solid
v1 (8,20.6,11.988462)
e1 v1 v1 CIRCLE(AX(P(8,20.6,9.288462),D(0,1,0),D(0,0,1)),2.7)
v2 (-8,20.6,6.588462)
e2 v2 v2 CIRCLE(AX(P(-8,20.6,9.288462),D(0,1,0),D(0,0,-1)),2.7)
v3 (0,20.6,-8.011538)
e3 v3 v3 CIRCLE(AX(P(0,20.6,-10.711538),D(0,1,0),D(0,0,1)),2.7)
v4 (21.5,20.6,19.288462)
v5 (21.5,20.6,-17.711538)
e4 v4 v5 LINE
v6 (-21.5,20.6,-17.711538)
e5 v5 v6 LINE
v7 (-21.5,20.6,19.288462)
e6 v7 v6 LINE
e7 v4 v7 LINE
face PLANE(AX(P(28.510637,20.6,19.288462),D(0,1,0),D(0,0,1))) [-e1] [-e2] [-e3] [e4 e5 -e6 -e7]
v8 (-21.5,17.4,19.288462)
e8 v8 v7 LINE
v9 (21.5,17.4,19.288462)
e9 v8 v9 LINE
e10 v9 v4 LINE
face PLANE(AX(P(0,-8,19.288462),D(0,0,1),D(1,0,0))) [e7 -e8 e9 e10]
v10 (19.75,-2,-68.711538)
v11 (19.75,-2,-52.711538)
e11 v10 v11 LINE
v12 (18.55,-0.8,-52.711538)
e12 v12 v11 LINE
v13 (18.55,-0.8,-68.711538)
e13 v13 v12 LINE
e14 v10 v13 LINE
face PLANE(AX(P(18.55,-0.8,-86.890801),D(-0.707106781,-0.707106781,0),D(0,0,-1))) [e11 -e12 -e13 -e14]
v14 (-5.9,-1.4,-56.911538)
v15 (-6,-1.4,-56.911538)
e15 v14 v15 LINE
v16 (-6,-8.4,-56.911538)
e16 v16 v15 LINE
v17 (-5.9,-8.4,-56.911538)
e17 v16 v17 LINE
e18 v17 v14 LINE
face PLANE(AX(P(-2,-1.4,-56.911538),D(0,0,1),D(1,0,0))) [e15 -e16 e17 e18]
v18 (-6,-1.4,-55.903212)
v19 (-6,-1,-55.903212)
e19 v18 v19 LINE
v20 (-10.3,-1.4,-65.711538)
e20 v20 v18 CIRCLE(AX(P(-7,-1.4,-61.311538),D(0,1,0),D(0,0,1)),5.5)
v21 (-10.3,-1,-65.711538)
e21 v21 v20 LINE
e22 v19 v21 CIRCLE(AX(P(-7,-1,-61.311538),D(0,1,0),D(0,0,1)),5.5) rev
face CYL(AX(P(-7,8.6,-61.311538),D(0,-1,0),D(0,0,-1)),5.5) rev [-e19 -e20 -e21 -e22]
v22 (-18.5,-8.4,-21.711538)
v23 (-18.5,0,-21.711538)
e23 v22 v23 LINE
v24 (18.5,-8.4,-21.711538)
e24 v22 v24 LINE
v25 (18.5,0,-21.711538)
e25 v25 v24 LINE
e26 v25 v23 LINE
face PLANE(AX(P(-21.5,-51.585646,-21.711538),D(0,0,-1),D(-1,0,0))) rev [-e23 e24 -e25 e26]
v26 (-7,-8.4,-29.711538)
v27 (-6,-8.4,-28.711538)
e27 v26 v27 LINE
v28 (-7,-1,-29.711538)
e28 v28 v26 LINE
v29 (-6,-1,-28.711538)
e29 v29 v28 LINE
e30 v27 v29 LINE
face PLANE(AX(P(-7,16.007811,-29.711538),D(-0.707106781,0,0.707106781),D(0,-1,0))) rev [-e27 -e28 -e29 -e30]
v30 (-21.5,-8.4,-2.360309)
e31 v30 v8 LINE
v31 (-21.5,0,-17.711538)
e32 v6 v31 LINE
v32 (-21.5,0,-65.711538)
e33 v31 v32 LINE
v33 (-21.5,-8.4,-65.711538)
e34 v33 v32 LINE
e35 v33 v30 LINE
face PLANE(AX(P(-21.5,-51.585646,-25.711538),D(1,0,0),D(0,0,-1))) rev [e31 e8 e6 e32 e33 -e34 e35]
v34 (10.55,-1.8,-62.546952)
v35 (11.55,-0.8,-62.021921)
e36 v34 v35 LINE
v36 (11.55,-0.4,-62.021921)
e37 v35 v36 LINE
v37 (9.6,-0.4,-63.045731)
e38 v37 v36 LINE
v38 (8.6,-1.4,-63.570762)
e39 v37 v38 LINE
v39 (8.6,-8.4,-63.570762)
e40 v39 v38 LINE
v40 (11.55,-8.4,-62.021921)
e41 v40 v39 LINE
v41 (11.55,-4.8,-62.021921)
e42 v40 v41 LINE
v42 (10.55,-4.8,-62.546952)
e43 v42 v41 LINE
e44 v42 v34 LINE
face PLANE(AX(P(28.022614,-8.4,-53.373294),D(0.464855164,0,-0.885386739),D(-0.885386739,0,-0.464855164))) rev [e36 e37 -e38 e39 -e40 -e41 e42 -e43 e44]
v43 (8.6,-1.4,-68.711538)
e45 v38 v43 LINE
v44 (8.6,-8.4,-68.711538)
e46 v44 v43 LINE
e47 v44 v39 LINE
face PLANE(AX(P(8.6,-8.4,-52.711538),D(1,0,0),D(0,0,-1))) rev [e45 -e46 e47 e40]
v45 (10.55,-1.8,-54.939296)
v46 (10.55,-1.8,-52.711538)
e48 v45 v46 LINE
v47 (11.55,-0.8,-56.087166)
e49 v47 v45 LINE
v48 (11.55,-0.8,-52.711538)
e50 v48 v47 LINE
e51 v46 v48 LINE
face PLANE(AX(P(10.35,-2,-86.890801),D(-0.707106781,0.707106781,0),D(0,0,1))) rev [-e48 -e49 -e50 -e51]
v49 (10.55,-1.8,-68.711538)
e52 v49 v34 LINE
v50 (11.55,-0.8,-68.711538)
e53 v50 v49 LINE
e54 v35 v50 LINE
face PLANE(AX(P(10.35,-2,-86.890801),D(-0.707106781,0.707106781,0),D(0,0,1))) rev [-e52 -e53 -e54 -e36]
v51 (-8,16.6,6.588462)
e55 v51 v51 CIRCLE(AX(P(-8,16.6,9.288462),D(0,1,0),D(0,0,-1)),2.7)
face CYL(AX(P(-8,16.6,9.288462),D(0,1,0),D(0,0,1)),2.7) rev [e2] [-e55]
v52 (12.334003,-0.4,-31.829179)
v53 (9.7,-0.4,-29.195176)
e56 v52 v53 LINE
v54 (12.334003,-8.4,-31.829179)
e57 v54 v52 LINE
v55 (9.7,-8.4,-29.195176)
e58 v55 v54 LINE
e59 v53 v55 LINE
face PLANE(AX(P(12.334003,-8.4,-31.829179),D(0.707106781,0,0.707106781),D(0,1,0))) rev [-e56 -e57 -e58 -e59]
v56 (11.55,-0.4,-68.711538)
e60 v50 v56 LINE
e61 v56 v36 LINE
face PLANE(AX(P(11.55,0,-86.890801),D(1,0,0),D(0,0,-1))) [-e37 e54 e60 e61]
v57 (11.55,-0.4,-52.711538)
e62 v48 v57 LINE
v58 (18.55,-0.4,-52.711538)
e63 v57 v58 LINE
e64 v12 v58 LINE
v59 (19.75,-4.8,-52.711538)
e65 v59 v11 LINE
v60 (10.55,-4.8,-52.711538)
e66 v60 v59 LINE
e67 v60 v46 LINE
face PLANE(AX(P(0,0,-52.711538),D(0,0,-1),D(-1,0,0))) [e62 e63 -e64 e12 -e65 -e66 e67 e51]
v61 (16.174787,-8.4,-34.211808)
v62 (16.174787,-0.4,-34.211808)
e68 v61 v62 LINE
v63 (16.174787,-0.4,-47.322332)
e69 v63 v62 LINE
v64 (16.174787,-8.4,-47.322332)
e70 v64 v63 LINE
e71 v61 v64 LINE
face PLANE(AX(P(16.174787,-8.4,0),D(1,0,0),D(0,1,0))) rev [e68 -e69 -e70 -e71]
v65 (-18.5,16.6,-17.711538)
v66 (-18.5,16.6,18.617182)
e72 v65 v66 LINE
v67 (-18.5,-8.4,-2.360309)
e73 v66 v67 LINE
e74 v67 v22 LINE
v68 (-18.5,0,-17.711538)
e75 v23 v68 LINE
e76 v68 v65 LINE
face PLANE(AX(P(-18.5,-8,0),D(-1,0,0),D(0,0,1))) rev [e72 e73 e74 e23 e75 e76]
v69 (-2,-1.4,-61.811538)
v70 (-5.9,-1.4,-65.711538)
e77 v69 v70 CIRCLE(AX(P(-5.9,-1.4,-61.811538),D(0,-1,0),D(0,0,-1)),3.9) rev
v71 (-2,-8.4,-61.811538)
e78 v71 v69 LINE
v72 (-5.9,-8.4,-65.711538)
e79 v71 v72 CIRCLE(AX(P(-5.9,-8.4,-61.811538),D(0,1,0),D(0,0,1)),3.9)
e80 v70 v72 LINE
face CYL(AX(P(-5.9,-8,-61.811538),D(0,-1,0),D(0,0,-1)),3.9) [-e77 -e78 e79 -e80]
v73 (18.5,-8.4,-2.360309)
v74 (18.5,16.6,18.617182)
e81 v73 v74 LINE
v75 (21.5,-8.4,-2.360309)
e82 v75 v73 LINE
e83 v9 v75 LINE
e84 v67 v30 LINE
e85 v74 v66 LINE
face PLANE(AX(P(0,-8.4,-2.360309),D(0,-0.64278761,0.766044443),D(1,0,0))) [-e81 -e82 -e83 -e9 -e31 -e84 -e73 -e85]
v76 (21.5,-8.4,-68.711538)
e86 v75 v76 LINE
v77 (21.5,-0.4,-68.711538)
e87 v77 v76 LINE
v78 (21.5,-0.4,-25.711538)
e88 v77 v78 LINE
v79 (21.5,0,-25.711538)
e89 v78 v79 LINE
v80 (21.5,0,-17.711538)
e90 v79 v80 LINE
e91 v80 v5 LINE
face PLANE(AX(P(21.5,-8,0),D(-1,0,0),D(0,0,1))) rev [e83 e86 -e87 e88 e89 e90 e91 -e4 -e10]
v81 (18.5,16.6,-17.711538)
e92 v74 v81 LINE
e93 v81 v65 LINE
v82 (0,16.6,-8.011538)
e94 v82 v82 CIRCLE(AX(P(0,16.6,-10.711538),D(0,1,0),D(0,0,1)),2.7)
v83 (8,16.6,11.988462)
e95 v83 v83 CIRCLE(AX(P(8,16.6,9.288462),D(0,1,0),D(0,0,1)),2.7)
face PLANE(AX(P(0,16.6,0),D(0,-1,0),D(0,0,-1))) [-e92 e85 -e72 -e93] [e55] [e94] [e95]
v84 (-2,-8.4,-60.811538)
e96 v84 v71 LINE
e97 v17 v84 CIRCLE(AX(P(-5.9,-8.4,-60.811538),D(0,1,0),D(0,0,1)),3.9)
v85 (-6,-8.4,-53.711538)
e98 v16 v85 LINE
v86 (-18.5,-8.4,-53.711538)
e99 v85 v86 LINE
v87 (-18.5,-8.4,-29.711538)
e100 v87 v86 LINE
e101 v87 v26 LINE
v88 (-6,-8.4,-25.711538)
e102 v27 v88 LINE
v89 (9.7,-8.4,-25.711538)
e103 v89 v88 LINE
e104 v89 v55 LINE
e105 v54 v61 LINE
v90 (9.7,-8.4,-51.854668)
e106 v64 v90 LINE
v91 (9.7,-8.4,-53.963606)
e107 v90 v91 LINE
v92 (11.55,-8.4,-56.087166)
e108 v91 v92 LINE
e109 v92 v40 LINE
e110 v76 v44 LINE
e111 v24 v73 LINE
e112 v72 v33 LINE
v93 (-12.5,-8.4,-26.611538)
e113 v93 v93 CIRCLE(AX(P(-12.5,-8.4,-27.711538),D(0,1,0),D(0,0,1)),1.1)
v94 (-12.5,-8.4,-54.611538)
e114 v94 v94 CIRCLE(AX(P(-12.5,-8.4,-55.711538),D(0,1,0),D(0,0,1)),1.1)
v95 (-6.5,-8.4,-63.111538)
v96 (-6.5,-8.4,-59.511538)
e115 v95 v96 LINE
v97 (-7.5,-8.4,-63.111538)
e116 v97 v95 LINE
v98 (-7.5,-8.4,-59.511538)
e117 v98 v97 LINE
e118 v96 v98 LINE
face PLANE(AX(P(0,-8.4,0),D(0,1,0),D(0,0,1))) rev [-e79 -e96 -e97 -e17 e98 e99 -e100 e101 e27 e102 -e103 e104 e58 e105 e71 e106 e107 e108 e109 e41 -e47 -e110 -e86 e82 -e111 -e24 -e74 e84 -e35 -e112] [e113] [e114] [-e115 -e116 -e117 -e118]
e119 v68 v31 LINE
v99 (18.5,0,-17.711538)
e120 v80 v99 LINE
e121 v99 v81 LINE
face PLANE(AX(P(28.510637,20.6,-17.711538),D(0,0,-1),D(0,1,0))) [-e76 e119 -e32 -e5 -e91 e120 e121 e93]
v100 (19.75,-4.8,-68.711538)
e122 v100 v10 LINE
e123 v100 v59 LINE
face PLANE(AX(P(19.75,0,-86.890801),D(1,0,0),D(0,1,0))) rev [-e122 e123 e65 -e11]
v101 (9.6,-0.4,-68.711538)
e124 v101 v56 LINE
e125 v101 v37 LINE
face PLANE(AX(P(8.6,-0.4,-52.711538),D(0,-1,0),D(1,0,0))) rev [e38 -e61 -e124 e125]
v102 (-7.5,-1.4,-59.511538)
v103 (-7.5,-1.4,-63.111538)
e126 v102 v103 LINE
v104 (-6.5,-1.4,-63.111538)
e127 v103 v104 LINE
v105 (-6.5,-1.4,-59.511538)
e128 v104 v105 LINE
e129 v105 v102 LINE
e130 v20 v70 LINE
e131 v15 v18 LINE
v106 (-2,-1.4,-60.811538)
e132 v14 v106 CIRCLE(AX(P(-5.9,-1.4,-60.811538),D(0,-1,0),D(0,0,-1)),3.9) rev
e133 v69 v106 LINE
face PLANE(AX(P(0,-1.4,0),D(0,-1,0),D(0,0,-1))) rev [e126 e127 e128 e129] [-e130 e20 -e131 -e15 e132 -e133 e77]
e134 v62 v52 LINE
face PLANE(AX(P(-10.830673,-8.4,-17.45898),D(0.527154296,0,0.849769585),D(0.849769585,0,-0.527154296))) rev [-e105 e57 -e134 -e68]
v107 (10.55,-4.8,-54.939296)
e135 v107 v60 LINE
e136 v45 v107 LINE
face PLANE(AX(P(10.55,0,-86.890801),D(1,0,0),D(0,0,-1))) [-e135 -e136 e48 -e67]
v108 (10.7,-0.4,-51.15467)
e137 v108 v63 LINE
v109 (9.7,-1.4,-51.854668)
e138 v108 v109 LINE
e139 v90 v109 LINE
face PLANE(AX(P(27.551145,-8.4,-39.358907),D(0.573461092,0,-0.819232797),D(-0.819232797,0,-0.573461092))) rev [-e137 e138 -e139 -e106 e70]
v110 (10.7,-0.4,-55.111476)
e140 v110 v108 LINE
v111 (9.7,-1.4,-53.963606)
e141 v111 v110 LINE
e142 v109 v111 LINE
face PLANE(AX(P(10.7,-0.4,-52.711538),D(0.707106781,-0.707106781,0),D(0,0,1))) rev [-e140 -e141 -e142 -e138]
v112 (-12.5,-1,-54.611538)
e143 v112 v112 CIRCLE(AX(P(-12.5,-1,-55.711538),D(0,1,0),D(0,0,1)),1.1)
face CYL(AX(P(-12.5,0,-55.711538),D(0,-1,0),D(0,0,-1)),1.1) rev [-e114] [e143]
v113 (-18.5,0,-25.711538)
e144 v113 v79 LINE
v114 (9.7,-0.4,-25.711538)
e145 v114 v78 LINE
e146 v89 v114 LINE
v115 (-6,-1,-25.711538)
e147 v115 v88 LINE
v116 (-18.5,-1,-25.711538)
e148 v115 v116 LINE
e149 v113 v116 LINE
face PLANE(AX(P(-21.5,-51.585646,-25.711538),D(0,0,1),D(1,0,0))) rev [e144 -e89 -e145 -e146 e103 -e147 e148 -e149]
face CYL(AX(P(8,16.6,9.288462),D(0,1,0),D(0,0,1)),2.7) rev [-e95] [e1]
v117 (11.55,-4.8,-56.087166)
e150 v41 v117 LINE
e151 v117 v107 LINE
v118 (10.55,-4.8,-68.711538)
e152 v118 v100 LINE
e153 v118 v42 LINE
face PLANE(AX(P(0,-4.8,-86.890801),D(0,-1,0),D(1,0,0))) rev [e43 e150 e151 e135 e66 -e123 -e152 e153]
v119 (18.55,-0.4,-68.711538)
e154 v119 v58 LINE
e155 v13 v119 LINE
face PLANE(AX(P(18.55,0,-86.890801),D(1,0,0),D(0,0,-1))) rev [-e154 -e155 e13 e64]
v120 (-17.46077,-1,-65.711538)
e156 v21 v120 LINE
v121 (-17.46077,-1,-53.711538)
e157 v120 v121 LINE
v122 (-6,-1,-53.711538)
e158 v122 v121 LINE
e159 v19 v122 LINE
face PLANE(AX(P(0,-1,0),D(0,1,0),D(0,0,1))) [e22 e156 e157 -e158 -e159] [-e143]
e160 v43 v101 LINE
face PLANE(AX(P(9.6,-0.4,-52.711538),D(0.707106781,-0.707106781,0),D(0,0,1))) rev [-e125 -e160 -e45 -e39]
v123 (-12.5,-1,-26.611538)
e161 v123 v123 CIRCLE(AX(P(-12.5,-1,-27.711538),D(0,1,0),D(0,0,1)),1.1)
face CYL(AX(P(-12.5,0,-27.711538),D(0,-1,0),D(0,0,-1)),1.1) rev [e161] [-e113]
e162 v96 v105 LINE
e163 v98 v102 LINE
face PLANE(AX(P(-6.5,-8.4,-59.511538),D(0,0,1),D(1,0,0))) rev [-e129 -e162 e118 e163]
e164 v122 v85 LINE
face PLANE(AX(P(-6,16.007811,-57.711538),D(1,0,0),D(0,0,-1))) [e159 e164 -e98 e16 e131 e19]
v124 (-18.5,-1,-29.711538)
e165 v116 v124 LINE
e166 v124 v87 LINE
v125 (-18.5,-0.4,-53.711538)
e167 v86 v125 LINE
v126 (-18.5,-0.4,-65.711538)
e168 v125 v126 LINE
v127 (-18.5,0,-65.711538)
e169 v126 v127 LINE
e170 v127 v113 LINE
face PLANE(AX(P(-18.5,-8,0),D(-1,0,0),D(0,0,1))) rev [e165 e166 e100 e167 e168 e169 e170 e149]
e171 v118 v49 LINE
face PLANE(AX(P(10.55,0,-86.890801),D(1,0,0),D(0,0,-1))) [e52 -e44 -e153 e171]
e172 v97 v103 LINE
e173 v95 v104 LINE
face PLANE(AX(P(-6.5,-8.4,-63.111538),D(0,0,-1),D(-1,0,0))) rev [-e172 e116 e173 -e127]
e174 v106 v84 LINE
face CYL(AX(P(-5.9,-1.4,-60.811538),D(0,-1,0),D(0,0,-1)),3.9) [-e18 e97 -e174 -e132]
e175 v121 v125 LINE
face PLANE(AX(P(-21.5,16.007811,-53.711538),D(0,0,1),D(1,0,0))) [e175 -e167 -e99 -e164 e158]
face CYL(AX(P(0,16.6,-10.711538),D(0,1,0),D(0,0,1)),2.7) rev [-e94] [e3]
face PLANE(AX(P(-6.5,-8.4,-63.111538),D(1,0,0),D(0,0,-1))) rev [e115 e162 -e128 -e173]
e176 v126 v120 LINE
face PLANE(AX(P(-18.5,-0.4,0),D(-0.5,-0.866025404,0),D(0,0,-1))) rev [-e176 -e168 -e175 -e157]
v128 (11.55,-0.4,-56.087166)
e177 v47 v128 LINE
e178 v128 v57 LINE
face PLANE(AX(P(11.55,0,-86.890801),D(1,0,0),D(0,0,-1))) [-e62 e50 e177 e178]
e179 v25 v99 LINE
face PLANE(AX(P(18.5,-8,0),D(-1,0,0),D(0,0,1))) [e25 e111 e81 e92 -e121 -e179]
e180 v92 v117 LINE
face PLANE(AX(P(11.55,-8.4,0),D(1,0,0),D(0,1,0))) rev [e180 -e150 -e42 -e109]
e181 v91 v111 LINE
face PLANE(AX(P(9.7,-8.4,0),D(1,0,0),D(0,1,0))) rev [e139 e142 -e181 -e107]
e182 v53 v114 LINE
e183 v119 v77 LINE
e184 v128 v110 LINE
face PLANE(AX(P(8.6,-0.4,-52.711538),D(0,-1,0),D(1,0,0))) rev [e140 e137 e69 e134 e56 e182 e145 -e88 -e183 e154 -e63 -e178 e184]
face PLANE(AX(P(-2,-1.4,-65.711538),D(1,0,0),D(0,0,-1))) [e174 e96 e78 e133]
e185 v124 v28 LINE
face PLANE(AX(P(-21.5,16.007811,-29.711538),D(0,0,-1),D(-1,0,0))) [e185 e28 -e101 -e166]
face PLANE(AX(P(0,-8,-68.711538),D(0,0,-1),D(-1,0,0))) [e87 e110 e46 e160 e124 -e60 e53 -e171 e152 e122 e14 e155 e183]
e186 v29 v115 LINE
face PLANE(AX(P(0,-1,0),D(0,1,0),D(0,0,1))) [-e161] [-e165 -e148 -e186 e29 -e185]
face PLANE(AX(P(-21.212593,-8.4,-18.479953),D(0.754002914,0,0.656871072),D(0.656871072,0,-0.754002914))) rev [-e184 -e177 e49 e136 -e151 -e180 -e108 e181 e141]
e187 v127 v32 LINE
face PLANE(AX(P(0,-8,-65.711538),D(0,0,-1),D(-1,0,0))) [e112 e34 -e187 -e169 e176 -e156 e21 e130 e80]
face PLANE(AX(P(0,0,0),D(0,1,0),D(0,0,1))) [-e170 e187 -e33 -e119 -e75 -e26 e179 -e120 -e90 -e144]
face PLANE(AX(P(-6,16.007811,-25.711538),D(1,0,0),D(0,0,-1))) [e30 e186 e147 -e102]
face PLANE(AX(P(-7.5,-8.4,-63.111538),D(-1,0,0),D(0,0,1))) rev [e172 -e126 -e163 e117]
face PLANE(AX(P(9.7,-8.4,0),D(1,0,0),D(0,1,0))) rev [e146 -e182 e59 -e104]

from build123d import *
from OCP.BRepFilletAPI import BRepFilletAPI_MakeChamfer

# Parameters (mm, degrees)
SKETCH1_W                       = 3
SKETCH1_H                       = 37
SKETCH1_H_2                     = 48
BOSS_EXTRUDE1_DEPTH             = 8
SKETCH4_W                       = 19.5
SKETCH4_H                       = 8.8
BOSS_EXTRUDE3_DEPTH             = 6.6
SERVO_HOLDER_DEPTH              = 0.4
SERVO_HOLDER_DEPTH_BACK         = 7
SKETCH3_W                       = 15.5
SKETCH3_H                       = 4
SKETCH3_R                       = 1.04
SKETCH5_W                       = 1
SKETCH5_H                       = 3.6
CUT_EXTRUDE2_DEPTH              = 70.647801738
SKETCH11_W                      = 43
SKETCH11_H                      = 4
BOSS_EXTRUDE9_DEPTH             = 8
BOSS_EXTRUDE9_DIRECTION_2_REACH = 71.601
SKETCH14_W                      = 12.223643904
SKETCH14_H                      = 44.979564252
CUT_EXTRUDE5_DEPTH              = 10
FILLET2_R                       = 3.9
CUT_EXTRUDE4_DEPTH              = 70.647801738
CUT_EXTRUDE4_DEPTH_BACK         = 70.647801738
SKETCH13_R                      = 1.1
SKETCH17_W                      = 12.9
SKETCH17_H                      = 8
BOSS_EXTRUDE11_DEPTH            = 27
BOSS_EXTRUDE12_DEPTH            = 16
SKETCH18_W                      = 1
SKETCH18_H                      = 3.6
SKETCH18_W_2                    = 3
SKETCH18_H_2                    = 24
SKETCH18_H_3                    = 41
BOSS_EXTRUDE13_DEPTH            = 0.4
CHAMFER14_SIZE                  = 1.2
CUT_EXTRUDE6_DEPTH              = 73.439806169
CUT_EXTRUDE6_DEPTH_BACK         = 73.439806169
SKETCH22_W                      = 43
SKETCH22_H                      = 37
SKETCH22_R                      = 2.7
MOUNT_TOP_DEPTH                 = 4
SKETCH23_W                      = 37
SKETCH23_H                      = 29
MOUNT_SIDE1_DEPTH               = 3
SKETCH24_W                      = 37
SKETCH24_H                      = 29
MOUNT_SIDE2_DEPTH               = 3
CHAMFER20_SIZE                  = 21.648770484
CHAMFER20_SIZE_2                = 25.8
SKETCH29_W                      = 8.885937164
SKETCH29_H                      = 8
BOSS_EXTRUDE20_DEPTH            = 0.4
CHAMFER23_SIZE                  = 1
CHAMFER24_SIZE                  = 1
CHAMFER24_SIZE2                 = 3.099667104
SKETCH26_R                      = 5.5
CUT_EXTRUDE8_DEPTH              = 10
CHAMFER25_SIZE                  = 0.6
CHAMFER25_SIZE2                 = 1.039230485


with BuildPart() as part:
    # Sketch1 → Boss-Extrude1 (new body)
    with BuildSketch(Plane(origin=(0, 0, 0), x_dir=(1, 0, 0), z_dir=(0, 1, 0))):
        with Locations((-20, -0.788461538)):
            Rectangle(SKETCH1_W, SKETCH1_H)
        with Locations((-20, 41.711538462)):
            Rectangle(SKETCH1_W, SKETCH1_H_2)
        with Locations((20, -0.788461538)):
            Rectangle(SKETCH1_W, SKETCH1_H)
        with Locations((20, 41.711538462)):
            Rectangle(SKETCH1_W, SKETCH1_H_2)
    extrude(amount=-BOSS_EXTRUDE1_DEPTH)

    # Sketch4 → Boss-Extrude3 (add)
    with BuildSketch(Plane.XZ.offset(8)):
        with Locations((-11.75, -61.311538462)):
            Rectangle(SKETCH4_W, SKETCH4_H)
    extrude(amount=-BOSS_EXTRUDE3_DEPTH)

    # Sketch3 → Servo Holder (add, two sides: drawn at the far end of the back side and taken through both)
    # profile 1 of 2: a face of its own
    with BuildSketch(Plane.XZ.offset(8).offset(-SERVO_HOLDER_DEPTH_BACK)):
        with Locations((-13.75, -55.711538462)):
            Rectangle(SKETCH3_W, SKETCH3_H)
        with Locations(Location((-12.5, -55.711538462, 0), (0, 0, 270))):
            Circle(SKETCH3_R, mode=Mode.SUBTRACT)
    # profile 2 of 2: a face of its own
    with BuildSketch(Plane.XZ.offset(8).offset(-SERVO_HOLDER_DEPTH_BACK)):
        with Locations((-13.75, -27.711538462)):
            Rectangle(SKETCH3_W, SKETCH3_H)
        with Locations(Location((-12.5, -27.711538462, 0), (0, 0, 90))):
            Circle(SKETCH3_R, mode=Mode.SUBTRACT)
    extrude(amount=SERVO_HOLDER_DEPTH + SERVO_HOLDER_DEPTH_BACK)

    # Sketch5 → Cut-Extrude2 (cut, through all)
    with BuildSketch(Plane(origin=(0, 0, 0), x_dir=(1, 0, 0), z_dir=(0, 1, 0))):
        with Locations((-7, 61.311538462)):
            Rectangle(SKETCH5_W, SKETCH5_H)
    extrude(amount=-CUT_EXTRUDE2_DEPTH, mode=Mode.SUBTRACT)

    # Sketch11 → Boss-Extrude9 (add)
    with BuildSketch(Plane.XZ.offset(8)):
        with Locations((0, -23.711538462)):
            Rectangle(SKETCH11_W, SKETCH11_H)
    extrude(amount=-BOSS_EXTRUDE9_DEPTH)

    # Boss-Extrude9 direction 2: up to this face of the body (flat: up to its plane)
    boss_extrude9_direction_2_end = Plane(part.part.faces().sort_by_distance((-13.822479257, -8.4, -55.711538462))[0])
    # Sketch11 → Boss-Extrude9 direction 2 (add, up to the picked face)
    with BuildSketch(Plane.XZ.offset(8), mode=Mode.PRIVATE) as boss_extrude9_direction_2_sk1:
        with Locations((0, -23.711538462)):
            Rectangle(SKETCH11_W, SKETCH11_H)
    boss_extrude9_direction_2_tool1 = split(extrude(boss_extrude9_direction_2_sk1.sketch, amount=BOSS_EXTRUDE9_DIRECTION_2_REACH, mode=Mode.PRIVATE), bisect_by=boss_extrude9_direction_2_end, keep=Keep.BOTH, mode=Mode.PRIVATE)
    add(boss_extrude9_direction_2_tool1.solids().sort_by(Axis((0, -8, -23.711538), (0, -1, 0)))[0])

    # Sketch14 → Cut-Extrude5 (cut)
    with BuildSketch(Plane.XZ.offset(8)):
        with Locations((24.611821952, -48.201320588)):
            Rectangle(SKETCH14_W, SKETCH14_H)
    extrude(amount=-CUT_EXTRUDE5_DEPTH, mode=Mode.SUBTRACT)

    # Fillet2
    fillet2_edges = [part.edges().sort_by_distance(p)[0] for p in [
        (-2, -4.7, -65.711538462),
        (-2, -4.7, -56.911538462),
    ]]
    fillet(fillet2_edges, radius=FILLET2_R)

    # Sketch13 → Cut-Extrude4 (cut, two sides: drawn at the far end of the back side and taken through both)
    with BuildSketch(Plane(origin=(0, -8.4, 0), x_dir=(-1, 0, 0), z_dir=(0, -1, 0)).offset(-CUT_EXTRUDE4_DEPTH_BACK)):
        with Locations(Location((12.5, 55.711538462, 0), (0, 0, 270))):
            Circle(SKETCH13_R)
        with Locations(Location((12.5, 27.711538462, 0), (0, 0, 270))):
            Circle(SKETCH13_R)
    extrude(amount=CUT_EXTRUDE4_DEPTH + CUT_EXTRUDE4_DEPTH_BACK, mode=Mode.SUBTRACT)

    # Sketch17 → Boss-Extrude11 (add)
    with BuildSketch(Plane(origin=(0, 0, -25.711538462), x_dir=(-1, 0, 0), z_dir=(0, 0, -1))):
        with Locations((-15.05, -4.4)):
            Rectangle(SKETCH17_W, SKETCH17_H)
    extrude(amount=BOSS_EXTRUDE11_DEPTH)

    # Sketch16 → Boss-Extrude12 (add)
    with BuildSketch(Plane(origin=(0, 0, -52.711538462), x_dir=(-1, 0, 0), z_dir=(0, 0, -1))):
        Polygon((-19.75, -2), (-18.55, -2), (-18.55, -0.4), (-21.5, -0.4), (-21.5, -8.4), (-8.6, -8.4), (-8.6, -0.4), (-11.55, -0.4), (-11.55, -2), (-10.55, -2), (-10.55, -4.8), (-19.75, -4.8), align=None)
    extrude(amount=BOSS_EXTRUDE12_DEPTH)

    # Sketch18 → Boss-Extrude13 (add)
    # profile 1 of 4: a face of its own
    with BuildSketch(Plane.XZ.offset(8)):
        with BuildLine():
            Line((-21.5, -57.711538462), (-21.5, -65.711538462))
            Line((-21.5, -65.711538462), (-5.9, -65.711538462))
            ThreePointArc((-5.9, -65.711538462), (-3.142283553, -64.569254908), (-2, -61.811538462))
            Line((-2, -61.811538462), (-2, -60.811538462))
            ThreePointArc((-2, -60.811538462), (-3.142283553, -58.053822015), (-5.9, -56.911538462))
            Line((-5.9, -56.911538462), (-6, -56.911538462))
            Line((-6, -56.911538462), (-6, -57.711538462))
            Line((-6, -57.711538462), (-21.5, -57.711538462))
        make_face()
        with Locations((-7, -61.311538462)):
            Rectangle(SKETCH18_W, SKETCH18_H, mode=Mode.SUBTRACT)
    # profile 2 of 4: a face of its own
    with BuildSketch(Plane.XZ.offset(8)):
        with Locations((-20, -41.711538462)):
            Rectangle(SKETCH18_W_2, SKETCH18_H_2)
    # profile 3 of 4: a face of its own
    with BuildSketch(Plane.XZ.offset(8)):
        with Locations((-20, -1.211538462)):
            Rectangle(SKETCH18_W_2, SKETCH18_H_3)
    # profile 4 of 4: a face of its own
    with BuildSketch(Plane.XZ.offset(8)):
        with Locations((20, -1.211538462)):
            Rectangle(SKETCH18_W_2, SKETCH18_H_3)
    extrude(amount=BOSS_EXTRUDE13_DEPTH)

    # Chamfer14
    # the kernel refuses this chamfer: 1.2 mm, written as the material it takes off along each edge
    with BuildSketch(Plane(origin=(18.55, -2, -52.711538462), x_dir=(0.9996219169112968, -0.027495876610586622, 0), z_dir=(0, 0, -1))) as chamfer14_piece_1_section:
        Polygon((CHAMFER14_SIZE * 0.999621916911, -CHAMFER14_SIZE * 0.0274958766106), (-CHAMFER14_SIZE * 0.0274958766106, -CHAMFER14_SIZE * 0.999621916911), (0, 0), align=None)
    chamfer14_piece_1 = extrude(amount=19.086019586, mode=Mode.PRIVATE)
    chamfer14_piece_1 = split(chamfer14_piece_1, bisect_by=Plane(origin=(19.75, -1.603515015, -62.254548254), z_dir=(-1, 0, 0)), keep=Keep.TOP, mode=Mode.PRIVATE)
    add(chamfer14_piece_1, mode=Mode.SUBTRACT)
    with BuildSketch(Plane(origin=(11.55, -2, -52.711538462), x_dir=(0.027495876610585914, 0.9996219169112968, 0), z_dir=(0, 0, -1))) as chamfer14_piece_2_section:
        Polygon((CHAMFER14_SIZE * 0.999621916911, -CHAMFER14_SIZE * 0.0274958766106), (-CHAMFER14_SIZE * 0.0274958766106, -CHAMFER14_SIZE * 0.999621916911), (0, 0), align=None)
    chamfer14_piece_2 = extrude(amount=19.086019586, mode=Mode.PRIVATE)
    chamfer14_piece_2 = split(chamfer14_piece_2, bisect_by=Plane(origin=(10.55, -1.589568171, -62.254548254), z_dir=(1, 0, 0)), keep=Keep.TOP, mode=Mode.PRIVATE)
    add(chamfer14_piece_2, mode=Mode.SUBTRACT)

    # Sketch20 → Cut-Extrude6 (cut, two sides: drawn at the far end of the back side and taken through both)
    with BuildSketch(Plane(origin=(0, -0.4, 0), x_dir=(1, 0, 0), z_dir=(0, 1, 0)).offset(-CUT_EXTRUDE6_DEPTH_BACK)):
        Polygon((8.6, 53.963605621), (8.6, 63.570761525), (2.515498959, 66.765310983), (1.997773223, 58.659131413), (1.997773223, 53.963605621), (4.974693998, 53.963605621), (4.974693998, 55.162371456), (6.687222193, 53.963605621), align=None)
        Polygon((8.6, 52.700948092), (8.6, 53.963605621), (6.687222193, 53.963605621), (8.558718605, 52.653562397), align=None)
        Polygon((16.174786864, 47.322331969), (9.7, 51.854668021), (9.7, 30.195176122), (16.174786864, 34.211808124), align=None)
        Polygon((4.974693998, 53.963605621), (6.687222193, 53.963605621), (4.974693998, 55.162371456), align=None)
        Polygon((11.55, 56.087166011), (11.55, 62.021921145), (8.6, 63.570761525), (8.6, 53.963605621), (9.7, 53.963605621), align=None)
        Polygon((8.6, 52.624665515), (8.6, 52.700948092), (8.558718605, 52.653562397), align=None)
        Polygon((9.7, 25.711538462), (9.7, 30.195176122), (8.6, 29.512791467), (8.6, 25.711538462), align=None)
        Polygon((9.7, 53.963605621), (8.6, 53.963605621), (8.6, 52.700948092), align=None)
        Polygon((9.7, 51.854668021), (9.7, 53.963605621), (8.6, 52.700948092), (8.6, 52.624665515), align=None)
        Polygon((8.558718605, 52.653562397), (6.687222193, 53.963605621), (4.974693998, 53.963605621), (4.974693998, 48.539566347), align=None)
        Polygon((9.7, 30.195176122), (9.7, 51.854668021), (8.6, 52.624665515), (8.6, 29.512791467), align=None)
        Polygon((8.6, 52.624665515), (8.558718605, 52.653562397), (4.974693998, 48.539566347), (4.974693998, 27.263834025), (8.6, 29.512791467), align=None)
    extrude(amount=CUT_EXTRUDE6_DEPTH + CUT_EXTRUDE6_DEPTH_BACK, mode=Mode.SUBTRACT)



with BuildPart() as body_2:
    # Sketch22 → Mount Top (new body)
    with BuildSketch(Plane(origin=(0, 20.6, 0), x_dir=(1, 0, 0), z_dir=(0, 1, 0))):
        with Locations((0, -0.788461538)):
            Rectangle(SKETCH22_W, SKETCH22_H)
        with Locations(Location((0, 10.711538462, 0), (0, 0, 270))):
            Circle(SKETCH22_R, mode=Mode.SUBTRACT)
        with Locations(Location((8, -9.288461538, 0), (0, 0, 270))):
            Circle(SKETCH22_R, mode=Mode.SUBTRACT)
        with Locations(Location((-8, -9.288461538, 0), (0, 0, 90))):
            Circle(SKETCH22_R, mode=Mode.SUBTRACT)
    extrude(amount=-MOUNT_TOP_DEPTH)


with BuildPart() as part_1:
    add(part.part)

    add(body_2.part)  # Mount Side1 merges body 2
    # Sketch23 → Mount Side1 (add)
    with BuildSketch(Plane.ZY.offset(21.5)):
        with Locations((0.788461538, 6.1)):
            Rectangle(SKETCH23_W, SKETCH23_H)
    extrude(amount=-MOUNT_SIDE1_DEPTH)

    # Sketch24 → Mount Side2 (add)
    with BuildSketch(Plane(origin=(21.5, 0, 0), x_dir=(0, 0, -1), z_dir=(1, 0, 0))):
        with Locations((-0.788461538, 6.1)):
            Rectangle(SKETCH24_W, SKETCH24_H)
    extrude(amount=-MOUNT_SIDE2_DEPTH)

    # Chamfer20
    # the kernel refuses this chamfer: 25.8, 21.648770484 mm, written as the material it takes off along each edge
    with BuildSketch(Plane(origin=(87.997077466, -8.4, 19.288461538), x_dir=(0, -0.03540953691366264, -0.9993728857116146), z_dir=(-1, 0, 0)), Plane(origin=(47.997077466, -8.4, 19.288461538), x_dir=(0, -0.03540953691366264, -0.9993728857116146), z_dir=(-1, 0, 0))) as chamfer20_piece_1:
        Polygon((CHAMFER20_SIZE * 0.999372885729, -CHAMFER20_SIZE * 0.0354095369143), (-CHAMFER20_SIZE_2 * 0.0354095369137, -CHAMFER20_SIZE_2 * 0.999372885712), (0, 0), align=None)
    extrude(amount=135.994154933, mode=Mode.SUBTRACT)

    # Sketch29 → Boss-Extrude20 (add)
    with BuildSketch(Plane(origin=(0, -1.4, 0), x_dir=(1, 0, 0), z_dir=(0, 1, 0))):
        with Locations((-14.057031418, 61.711538462)):
            Rectangle(SKETCH29_W, SKETCH29_H)
    extrude(amount=BOSS_EXTRUDE20_DEPTH)

    # Chamfer23
    chamfer23_edges = [part_1.edges().sort_by_distance(p)[0] for p in [
        (9.7, -0.4, -52.909136821),
    ]]
    chamfer(chamfer23_edges, length=CHAMFER23_SIZE)

    # Chamfer24: one chamfer whose edges measure the first distance from different faces: ONE call of the kernel's chamfer builder (chamfer() names one face for all edges)
    chamfer24_edges_1 = [part_1.edges().sort_by_distance(p)[0] for p in [
        (8.6, -0.4, -66.141149993),
        (-6, -4.7, -29.711538462),
    ]]
    chamfer24_edges_2 = [part_1.edges().sort_by_distance(p)[0] for p in [
        (9.7, -4.4, -30.195176122),
    ]]
    chamfer24_side_2 = [part_1.faces().sort_by_distance(p)[0] for p in [
        (9.7, -4.4, -27.953357292),
    ]]
    chamfer24 = BRepFilletAPI_MakeChamfer(part_1.part.solid().wrapped)
    for e in chamfer24_edges_1:
        chamfer24.Add(CHAMFER24_SIZE, e.wrapped)
    for e in chamfer24_edges_2:
        chamfer24.Add(CHAMFER24_SIZE, CHAMFER24_SIZE2, e.wrapped, chamfer24_side_2[0].wrapped)  # the first distance lies on this face
    add(Compound.cast(chamfer24.Shape()), mode=Mode.REPLACE)

    # Sketch26 → Cut-Extrude8 (cut)
    with BuildSketch(Plane(origin=(0, -1.4, 0), x_dir=(1, 0, 0), z_dir=(0, 1, 0))):
        with Locations((-7, 61.311538462)):
            Circle(SKETCH26_R)
    extrude(amount=CUT_EXTRUDE8_DEPTH, mode=Mode.SUBTRACT)

    # Chamfer25
    chamfer25_edges = [part_1.edges().sort_by_distance(p)[0] for p in [
        (-18.5, -1, -59.711538462),
    ]]
    chamfer25_side = [part_1.faces().sort_by_distance(p)[0] for p in [
        (-18.5, -3.927941176, -42.446832579),
    ]]
    chamfer(chamfer25_edges, length=CHAMFER25_SIZE, length2=CHAMFER25_SIZE2, reference=chamfer25_side[0])


solid = part_1.part
